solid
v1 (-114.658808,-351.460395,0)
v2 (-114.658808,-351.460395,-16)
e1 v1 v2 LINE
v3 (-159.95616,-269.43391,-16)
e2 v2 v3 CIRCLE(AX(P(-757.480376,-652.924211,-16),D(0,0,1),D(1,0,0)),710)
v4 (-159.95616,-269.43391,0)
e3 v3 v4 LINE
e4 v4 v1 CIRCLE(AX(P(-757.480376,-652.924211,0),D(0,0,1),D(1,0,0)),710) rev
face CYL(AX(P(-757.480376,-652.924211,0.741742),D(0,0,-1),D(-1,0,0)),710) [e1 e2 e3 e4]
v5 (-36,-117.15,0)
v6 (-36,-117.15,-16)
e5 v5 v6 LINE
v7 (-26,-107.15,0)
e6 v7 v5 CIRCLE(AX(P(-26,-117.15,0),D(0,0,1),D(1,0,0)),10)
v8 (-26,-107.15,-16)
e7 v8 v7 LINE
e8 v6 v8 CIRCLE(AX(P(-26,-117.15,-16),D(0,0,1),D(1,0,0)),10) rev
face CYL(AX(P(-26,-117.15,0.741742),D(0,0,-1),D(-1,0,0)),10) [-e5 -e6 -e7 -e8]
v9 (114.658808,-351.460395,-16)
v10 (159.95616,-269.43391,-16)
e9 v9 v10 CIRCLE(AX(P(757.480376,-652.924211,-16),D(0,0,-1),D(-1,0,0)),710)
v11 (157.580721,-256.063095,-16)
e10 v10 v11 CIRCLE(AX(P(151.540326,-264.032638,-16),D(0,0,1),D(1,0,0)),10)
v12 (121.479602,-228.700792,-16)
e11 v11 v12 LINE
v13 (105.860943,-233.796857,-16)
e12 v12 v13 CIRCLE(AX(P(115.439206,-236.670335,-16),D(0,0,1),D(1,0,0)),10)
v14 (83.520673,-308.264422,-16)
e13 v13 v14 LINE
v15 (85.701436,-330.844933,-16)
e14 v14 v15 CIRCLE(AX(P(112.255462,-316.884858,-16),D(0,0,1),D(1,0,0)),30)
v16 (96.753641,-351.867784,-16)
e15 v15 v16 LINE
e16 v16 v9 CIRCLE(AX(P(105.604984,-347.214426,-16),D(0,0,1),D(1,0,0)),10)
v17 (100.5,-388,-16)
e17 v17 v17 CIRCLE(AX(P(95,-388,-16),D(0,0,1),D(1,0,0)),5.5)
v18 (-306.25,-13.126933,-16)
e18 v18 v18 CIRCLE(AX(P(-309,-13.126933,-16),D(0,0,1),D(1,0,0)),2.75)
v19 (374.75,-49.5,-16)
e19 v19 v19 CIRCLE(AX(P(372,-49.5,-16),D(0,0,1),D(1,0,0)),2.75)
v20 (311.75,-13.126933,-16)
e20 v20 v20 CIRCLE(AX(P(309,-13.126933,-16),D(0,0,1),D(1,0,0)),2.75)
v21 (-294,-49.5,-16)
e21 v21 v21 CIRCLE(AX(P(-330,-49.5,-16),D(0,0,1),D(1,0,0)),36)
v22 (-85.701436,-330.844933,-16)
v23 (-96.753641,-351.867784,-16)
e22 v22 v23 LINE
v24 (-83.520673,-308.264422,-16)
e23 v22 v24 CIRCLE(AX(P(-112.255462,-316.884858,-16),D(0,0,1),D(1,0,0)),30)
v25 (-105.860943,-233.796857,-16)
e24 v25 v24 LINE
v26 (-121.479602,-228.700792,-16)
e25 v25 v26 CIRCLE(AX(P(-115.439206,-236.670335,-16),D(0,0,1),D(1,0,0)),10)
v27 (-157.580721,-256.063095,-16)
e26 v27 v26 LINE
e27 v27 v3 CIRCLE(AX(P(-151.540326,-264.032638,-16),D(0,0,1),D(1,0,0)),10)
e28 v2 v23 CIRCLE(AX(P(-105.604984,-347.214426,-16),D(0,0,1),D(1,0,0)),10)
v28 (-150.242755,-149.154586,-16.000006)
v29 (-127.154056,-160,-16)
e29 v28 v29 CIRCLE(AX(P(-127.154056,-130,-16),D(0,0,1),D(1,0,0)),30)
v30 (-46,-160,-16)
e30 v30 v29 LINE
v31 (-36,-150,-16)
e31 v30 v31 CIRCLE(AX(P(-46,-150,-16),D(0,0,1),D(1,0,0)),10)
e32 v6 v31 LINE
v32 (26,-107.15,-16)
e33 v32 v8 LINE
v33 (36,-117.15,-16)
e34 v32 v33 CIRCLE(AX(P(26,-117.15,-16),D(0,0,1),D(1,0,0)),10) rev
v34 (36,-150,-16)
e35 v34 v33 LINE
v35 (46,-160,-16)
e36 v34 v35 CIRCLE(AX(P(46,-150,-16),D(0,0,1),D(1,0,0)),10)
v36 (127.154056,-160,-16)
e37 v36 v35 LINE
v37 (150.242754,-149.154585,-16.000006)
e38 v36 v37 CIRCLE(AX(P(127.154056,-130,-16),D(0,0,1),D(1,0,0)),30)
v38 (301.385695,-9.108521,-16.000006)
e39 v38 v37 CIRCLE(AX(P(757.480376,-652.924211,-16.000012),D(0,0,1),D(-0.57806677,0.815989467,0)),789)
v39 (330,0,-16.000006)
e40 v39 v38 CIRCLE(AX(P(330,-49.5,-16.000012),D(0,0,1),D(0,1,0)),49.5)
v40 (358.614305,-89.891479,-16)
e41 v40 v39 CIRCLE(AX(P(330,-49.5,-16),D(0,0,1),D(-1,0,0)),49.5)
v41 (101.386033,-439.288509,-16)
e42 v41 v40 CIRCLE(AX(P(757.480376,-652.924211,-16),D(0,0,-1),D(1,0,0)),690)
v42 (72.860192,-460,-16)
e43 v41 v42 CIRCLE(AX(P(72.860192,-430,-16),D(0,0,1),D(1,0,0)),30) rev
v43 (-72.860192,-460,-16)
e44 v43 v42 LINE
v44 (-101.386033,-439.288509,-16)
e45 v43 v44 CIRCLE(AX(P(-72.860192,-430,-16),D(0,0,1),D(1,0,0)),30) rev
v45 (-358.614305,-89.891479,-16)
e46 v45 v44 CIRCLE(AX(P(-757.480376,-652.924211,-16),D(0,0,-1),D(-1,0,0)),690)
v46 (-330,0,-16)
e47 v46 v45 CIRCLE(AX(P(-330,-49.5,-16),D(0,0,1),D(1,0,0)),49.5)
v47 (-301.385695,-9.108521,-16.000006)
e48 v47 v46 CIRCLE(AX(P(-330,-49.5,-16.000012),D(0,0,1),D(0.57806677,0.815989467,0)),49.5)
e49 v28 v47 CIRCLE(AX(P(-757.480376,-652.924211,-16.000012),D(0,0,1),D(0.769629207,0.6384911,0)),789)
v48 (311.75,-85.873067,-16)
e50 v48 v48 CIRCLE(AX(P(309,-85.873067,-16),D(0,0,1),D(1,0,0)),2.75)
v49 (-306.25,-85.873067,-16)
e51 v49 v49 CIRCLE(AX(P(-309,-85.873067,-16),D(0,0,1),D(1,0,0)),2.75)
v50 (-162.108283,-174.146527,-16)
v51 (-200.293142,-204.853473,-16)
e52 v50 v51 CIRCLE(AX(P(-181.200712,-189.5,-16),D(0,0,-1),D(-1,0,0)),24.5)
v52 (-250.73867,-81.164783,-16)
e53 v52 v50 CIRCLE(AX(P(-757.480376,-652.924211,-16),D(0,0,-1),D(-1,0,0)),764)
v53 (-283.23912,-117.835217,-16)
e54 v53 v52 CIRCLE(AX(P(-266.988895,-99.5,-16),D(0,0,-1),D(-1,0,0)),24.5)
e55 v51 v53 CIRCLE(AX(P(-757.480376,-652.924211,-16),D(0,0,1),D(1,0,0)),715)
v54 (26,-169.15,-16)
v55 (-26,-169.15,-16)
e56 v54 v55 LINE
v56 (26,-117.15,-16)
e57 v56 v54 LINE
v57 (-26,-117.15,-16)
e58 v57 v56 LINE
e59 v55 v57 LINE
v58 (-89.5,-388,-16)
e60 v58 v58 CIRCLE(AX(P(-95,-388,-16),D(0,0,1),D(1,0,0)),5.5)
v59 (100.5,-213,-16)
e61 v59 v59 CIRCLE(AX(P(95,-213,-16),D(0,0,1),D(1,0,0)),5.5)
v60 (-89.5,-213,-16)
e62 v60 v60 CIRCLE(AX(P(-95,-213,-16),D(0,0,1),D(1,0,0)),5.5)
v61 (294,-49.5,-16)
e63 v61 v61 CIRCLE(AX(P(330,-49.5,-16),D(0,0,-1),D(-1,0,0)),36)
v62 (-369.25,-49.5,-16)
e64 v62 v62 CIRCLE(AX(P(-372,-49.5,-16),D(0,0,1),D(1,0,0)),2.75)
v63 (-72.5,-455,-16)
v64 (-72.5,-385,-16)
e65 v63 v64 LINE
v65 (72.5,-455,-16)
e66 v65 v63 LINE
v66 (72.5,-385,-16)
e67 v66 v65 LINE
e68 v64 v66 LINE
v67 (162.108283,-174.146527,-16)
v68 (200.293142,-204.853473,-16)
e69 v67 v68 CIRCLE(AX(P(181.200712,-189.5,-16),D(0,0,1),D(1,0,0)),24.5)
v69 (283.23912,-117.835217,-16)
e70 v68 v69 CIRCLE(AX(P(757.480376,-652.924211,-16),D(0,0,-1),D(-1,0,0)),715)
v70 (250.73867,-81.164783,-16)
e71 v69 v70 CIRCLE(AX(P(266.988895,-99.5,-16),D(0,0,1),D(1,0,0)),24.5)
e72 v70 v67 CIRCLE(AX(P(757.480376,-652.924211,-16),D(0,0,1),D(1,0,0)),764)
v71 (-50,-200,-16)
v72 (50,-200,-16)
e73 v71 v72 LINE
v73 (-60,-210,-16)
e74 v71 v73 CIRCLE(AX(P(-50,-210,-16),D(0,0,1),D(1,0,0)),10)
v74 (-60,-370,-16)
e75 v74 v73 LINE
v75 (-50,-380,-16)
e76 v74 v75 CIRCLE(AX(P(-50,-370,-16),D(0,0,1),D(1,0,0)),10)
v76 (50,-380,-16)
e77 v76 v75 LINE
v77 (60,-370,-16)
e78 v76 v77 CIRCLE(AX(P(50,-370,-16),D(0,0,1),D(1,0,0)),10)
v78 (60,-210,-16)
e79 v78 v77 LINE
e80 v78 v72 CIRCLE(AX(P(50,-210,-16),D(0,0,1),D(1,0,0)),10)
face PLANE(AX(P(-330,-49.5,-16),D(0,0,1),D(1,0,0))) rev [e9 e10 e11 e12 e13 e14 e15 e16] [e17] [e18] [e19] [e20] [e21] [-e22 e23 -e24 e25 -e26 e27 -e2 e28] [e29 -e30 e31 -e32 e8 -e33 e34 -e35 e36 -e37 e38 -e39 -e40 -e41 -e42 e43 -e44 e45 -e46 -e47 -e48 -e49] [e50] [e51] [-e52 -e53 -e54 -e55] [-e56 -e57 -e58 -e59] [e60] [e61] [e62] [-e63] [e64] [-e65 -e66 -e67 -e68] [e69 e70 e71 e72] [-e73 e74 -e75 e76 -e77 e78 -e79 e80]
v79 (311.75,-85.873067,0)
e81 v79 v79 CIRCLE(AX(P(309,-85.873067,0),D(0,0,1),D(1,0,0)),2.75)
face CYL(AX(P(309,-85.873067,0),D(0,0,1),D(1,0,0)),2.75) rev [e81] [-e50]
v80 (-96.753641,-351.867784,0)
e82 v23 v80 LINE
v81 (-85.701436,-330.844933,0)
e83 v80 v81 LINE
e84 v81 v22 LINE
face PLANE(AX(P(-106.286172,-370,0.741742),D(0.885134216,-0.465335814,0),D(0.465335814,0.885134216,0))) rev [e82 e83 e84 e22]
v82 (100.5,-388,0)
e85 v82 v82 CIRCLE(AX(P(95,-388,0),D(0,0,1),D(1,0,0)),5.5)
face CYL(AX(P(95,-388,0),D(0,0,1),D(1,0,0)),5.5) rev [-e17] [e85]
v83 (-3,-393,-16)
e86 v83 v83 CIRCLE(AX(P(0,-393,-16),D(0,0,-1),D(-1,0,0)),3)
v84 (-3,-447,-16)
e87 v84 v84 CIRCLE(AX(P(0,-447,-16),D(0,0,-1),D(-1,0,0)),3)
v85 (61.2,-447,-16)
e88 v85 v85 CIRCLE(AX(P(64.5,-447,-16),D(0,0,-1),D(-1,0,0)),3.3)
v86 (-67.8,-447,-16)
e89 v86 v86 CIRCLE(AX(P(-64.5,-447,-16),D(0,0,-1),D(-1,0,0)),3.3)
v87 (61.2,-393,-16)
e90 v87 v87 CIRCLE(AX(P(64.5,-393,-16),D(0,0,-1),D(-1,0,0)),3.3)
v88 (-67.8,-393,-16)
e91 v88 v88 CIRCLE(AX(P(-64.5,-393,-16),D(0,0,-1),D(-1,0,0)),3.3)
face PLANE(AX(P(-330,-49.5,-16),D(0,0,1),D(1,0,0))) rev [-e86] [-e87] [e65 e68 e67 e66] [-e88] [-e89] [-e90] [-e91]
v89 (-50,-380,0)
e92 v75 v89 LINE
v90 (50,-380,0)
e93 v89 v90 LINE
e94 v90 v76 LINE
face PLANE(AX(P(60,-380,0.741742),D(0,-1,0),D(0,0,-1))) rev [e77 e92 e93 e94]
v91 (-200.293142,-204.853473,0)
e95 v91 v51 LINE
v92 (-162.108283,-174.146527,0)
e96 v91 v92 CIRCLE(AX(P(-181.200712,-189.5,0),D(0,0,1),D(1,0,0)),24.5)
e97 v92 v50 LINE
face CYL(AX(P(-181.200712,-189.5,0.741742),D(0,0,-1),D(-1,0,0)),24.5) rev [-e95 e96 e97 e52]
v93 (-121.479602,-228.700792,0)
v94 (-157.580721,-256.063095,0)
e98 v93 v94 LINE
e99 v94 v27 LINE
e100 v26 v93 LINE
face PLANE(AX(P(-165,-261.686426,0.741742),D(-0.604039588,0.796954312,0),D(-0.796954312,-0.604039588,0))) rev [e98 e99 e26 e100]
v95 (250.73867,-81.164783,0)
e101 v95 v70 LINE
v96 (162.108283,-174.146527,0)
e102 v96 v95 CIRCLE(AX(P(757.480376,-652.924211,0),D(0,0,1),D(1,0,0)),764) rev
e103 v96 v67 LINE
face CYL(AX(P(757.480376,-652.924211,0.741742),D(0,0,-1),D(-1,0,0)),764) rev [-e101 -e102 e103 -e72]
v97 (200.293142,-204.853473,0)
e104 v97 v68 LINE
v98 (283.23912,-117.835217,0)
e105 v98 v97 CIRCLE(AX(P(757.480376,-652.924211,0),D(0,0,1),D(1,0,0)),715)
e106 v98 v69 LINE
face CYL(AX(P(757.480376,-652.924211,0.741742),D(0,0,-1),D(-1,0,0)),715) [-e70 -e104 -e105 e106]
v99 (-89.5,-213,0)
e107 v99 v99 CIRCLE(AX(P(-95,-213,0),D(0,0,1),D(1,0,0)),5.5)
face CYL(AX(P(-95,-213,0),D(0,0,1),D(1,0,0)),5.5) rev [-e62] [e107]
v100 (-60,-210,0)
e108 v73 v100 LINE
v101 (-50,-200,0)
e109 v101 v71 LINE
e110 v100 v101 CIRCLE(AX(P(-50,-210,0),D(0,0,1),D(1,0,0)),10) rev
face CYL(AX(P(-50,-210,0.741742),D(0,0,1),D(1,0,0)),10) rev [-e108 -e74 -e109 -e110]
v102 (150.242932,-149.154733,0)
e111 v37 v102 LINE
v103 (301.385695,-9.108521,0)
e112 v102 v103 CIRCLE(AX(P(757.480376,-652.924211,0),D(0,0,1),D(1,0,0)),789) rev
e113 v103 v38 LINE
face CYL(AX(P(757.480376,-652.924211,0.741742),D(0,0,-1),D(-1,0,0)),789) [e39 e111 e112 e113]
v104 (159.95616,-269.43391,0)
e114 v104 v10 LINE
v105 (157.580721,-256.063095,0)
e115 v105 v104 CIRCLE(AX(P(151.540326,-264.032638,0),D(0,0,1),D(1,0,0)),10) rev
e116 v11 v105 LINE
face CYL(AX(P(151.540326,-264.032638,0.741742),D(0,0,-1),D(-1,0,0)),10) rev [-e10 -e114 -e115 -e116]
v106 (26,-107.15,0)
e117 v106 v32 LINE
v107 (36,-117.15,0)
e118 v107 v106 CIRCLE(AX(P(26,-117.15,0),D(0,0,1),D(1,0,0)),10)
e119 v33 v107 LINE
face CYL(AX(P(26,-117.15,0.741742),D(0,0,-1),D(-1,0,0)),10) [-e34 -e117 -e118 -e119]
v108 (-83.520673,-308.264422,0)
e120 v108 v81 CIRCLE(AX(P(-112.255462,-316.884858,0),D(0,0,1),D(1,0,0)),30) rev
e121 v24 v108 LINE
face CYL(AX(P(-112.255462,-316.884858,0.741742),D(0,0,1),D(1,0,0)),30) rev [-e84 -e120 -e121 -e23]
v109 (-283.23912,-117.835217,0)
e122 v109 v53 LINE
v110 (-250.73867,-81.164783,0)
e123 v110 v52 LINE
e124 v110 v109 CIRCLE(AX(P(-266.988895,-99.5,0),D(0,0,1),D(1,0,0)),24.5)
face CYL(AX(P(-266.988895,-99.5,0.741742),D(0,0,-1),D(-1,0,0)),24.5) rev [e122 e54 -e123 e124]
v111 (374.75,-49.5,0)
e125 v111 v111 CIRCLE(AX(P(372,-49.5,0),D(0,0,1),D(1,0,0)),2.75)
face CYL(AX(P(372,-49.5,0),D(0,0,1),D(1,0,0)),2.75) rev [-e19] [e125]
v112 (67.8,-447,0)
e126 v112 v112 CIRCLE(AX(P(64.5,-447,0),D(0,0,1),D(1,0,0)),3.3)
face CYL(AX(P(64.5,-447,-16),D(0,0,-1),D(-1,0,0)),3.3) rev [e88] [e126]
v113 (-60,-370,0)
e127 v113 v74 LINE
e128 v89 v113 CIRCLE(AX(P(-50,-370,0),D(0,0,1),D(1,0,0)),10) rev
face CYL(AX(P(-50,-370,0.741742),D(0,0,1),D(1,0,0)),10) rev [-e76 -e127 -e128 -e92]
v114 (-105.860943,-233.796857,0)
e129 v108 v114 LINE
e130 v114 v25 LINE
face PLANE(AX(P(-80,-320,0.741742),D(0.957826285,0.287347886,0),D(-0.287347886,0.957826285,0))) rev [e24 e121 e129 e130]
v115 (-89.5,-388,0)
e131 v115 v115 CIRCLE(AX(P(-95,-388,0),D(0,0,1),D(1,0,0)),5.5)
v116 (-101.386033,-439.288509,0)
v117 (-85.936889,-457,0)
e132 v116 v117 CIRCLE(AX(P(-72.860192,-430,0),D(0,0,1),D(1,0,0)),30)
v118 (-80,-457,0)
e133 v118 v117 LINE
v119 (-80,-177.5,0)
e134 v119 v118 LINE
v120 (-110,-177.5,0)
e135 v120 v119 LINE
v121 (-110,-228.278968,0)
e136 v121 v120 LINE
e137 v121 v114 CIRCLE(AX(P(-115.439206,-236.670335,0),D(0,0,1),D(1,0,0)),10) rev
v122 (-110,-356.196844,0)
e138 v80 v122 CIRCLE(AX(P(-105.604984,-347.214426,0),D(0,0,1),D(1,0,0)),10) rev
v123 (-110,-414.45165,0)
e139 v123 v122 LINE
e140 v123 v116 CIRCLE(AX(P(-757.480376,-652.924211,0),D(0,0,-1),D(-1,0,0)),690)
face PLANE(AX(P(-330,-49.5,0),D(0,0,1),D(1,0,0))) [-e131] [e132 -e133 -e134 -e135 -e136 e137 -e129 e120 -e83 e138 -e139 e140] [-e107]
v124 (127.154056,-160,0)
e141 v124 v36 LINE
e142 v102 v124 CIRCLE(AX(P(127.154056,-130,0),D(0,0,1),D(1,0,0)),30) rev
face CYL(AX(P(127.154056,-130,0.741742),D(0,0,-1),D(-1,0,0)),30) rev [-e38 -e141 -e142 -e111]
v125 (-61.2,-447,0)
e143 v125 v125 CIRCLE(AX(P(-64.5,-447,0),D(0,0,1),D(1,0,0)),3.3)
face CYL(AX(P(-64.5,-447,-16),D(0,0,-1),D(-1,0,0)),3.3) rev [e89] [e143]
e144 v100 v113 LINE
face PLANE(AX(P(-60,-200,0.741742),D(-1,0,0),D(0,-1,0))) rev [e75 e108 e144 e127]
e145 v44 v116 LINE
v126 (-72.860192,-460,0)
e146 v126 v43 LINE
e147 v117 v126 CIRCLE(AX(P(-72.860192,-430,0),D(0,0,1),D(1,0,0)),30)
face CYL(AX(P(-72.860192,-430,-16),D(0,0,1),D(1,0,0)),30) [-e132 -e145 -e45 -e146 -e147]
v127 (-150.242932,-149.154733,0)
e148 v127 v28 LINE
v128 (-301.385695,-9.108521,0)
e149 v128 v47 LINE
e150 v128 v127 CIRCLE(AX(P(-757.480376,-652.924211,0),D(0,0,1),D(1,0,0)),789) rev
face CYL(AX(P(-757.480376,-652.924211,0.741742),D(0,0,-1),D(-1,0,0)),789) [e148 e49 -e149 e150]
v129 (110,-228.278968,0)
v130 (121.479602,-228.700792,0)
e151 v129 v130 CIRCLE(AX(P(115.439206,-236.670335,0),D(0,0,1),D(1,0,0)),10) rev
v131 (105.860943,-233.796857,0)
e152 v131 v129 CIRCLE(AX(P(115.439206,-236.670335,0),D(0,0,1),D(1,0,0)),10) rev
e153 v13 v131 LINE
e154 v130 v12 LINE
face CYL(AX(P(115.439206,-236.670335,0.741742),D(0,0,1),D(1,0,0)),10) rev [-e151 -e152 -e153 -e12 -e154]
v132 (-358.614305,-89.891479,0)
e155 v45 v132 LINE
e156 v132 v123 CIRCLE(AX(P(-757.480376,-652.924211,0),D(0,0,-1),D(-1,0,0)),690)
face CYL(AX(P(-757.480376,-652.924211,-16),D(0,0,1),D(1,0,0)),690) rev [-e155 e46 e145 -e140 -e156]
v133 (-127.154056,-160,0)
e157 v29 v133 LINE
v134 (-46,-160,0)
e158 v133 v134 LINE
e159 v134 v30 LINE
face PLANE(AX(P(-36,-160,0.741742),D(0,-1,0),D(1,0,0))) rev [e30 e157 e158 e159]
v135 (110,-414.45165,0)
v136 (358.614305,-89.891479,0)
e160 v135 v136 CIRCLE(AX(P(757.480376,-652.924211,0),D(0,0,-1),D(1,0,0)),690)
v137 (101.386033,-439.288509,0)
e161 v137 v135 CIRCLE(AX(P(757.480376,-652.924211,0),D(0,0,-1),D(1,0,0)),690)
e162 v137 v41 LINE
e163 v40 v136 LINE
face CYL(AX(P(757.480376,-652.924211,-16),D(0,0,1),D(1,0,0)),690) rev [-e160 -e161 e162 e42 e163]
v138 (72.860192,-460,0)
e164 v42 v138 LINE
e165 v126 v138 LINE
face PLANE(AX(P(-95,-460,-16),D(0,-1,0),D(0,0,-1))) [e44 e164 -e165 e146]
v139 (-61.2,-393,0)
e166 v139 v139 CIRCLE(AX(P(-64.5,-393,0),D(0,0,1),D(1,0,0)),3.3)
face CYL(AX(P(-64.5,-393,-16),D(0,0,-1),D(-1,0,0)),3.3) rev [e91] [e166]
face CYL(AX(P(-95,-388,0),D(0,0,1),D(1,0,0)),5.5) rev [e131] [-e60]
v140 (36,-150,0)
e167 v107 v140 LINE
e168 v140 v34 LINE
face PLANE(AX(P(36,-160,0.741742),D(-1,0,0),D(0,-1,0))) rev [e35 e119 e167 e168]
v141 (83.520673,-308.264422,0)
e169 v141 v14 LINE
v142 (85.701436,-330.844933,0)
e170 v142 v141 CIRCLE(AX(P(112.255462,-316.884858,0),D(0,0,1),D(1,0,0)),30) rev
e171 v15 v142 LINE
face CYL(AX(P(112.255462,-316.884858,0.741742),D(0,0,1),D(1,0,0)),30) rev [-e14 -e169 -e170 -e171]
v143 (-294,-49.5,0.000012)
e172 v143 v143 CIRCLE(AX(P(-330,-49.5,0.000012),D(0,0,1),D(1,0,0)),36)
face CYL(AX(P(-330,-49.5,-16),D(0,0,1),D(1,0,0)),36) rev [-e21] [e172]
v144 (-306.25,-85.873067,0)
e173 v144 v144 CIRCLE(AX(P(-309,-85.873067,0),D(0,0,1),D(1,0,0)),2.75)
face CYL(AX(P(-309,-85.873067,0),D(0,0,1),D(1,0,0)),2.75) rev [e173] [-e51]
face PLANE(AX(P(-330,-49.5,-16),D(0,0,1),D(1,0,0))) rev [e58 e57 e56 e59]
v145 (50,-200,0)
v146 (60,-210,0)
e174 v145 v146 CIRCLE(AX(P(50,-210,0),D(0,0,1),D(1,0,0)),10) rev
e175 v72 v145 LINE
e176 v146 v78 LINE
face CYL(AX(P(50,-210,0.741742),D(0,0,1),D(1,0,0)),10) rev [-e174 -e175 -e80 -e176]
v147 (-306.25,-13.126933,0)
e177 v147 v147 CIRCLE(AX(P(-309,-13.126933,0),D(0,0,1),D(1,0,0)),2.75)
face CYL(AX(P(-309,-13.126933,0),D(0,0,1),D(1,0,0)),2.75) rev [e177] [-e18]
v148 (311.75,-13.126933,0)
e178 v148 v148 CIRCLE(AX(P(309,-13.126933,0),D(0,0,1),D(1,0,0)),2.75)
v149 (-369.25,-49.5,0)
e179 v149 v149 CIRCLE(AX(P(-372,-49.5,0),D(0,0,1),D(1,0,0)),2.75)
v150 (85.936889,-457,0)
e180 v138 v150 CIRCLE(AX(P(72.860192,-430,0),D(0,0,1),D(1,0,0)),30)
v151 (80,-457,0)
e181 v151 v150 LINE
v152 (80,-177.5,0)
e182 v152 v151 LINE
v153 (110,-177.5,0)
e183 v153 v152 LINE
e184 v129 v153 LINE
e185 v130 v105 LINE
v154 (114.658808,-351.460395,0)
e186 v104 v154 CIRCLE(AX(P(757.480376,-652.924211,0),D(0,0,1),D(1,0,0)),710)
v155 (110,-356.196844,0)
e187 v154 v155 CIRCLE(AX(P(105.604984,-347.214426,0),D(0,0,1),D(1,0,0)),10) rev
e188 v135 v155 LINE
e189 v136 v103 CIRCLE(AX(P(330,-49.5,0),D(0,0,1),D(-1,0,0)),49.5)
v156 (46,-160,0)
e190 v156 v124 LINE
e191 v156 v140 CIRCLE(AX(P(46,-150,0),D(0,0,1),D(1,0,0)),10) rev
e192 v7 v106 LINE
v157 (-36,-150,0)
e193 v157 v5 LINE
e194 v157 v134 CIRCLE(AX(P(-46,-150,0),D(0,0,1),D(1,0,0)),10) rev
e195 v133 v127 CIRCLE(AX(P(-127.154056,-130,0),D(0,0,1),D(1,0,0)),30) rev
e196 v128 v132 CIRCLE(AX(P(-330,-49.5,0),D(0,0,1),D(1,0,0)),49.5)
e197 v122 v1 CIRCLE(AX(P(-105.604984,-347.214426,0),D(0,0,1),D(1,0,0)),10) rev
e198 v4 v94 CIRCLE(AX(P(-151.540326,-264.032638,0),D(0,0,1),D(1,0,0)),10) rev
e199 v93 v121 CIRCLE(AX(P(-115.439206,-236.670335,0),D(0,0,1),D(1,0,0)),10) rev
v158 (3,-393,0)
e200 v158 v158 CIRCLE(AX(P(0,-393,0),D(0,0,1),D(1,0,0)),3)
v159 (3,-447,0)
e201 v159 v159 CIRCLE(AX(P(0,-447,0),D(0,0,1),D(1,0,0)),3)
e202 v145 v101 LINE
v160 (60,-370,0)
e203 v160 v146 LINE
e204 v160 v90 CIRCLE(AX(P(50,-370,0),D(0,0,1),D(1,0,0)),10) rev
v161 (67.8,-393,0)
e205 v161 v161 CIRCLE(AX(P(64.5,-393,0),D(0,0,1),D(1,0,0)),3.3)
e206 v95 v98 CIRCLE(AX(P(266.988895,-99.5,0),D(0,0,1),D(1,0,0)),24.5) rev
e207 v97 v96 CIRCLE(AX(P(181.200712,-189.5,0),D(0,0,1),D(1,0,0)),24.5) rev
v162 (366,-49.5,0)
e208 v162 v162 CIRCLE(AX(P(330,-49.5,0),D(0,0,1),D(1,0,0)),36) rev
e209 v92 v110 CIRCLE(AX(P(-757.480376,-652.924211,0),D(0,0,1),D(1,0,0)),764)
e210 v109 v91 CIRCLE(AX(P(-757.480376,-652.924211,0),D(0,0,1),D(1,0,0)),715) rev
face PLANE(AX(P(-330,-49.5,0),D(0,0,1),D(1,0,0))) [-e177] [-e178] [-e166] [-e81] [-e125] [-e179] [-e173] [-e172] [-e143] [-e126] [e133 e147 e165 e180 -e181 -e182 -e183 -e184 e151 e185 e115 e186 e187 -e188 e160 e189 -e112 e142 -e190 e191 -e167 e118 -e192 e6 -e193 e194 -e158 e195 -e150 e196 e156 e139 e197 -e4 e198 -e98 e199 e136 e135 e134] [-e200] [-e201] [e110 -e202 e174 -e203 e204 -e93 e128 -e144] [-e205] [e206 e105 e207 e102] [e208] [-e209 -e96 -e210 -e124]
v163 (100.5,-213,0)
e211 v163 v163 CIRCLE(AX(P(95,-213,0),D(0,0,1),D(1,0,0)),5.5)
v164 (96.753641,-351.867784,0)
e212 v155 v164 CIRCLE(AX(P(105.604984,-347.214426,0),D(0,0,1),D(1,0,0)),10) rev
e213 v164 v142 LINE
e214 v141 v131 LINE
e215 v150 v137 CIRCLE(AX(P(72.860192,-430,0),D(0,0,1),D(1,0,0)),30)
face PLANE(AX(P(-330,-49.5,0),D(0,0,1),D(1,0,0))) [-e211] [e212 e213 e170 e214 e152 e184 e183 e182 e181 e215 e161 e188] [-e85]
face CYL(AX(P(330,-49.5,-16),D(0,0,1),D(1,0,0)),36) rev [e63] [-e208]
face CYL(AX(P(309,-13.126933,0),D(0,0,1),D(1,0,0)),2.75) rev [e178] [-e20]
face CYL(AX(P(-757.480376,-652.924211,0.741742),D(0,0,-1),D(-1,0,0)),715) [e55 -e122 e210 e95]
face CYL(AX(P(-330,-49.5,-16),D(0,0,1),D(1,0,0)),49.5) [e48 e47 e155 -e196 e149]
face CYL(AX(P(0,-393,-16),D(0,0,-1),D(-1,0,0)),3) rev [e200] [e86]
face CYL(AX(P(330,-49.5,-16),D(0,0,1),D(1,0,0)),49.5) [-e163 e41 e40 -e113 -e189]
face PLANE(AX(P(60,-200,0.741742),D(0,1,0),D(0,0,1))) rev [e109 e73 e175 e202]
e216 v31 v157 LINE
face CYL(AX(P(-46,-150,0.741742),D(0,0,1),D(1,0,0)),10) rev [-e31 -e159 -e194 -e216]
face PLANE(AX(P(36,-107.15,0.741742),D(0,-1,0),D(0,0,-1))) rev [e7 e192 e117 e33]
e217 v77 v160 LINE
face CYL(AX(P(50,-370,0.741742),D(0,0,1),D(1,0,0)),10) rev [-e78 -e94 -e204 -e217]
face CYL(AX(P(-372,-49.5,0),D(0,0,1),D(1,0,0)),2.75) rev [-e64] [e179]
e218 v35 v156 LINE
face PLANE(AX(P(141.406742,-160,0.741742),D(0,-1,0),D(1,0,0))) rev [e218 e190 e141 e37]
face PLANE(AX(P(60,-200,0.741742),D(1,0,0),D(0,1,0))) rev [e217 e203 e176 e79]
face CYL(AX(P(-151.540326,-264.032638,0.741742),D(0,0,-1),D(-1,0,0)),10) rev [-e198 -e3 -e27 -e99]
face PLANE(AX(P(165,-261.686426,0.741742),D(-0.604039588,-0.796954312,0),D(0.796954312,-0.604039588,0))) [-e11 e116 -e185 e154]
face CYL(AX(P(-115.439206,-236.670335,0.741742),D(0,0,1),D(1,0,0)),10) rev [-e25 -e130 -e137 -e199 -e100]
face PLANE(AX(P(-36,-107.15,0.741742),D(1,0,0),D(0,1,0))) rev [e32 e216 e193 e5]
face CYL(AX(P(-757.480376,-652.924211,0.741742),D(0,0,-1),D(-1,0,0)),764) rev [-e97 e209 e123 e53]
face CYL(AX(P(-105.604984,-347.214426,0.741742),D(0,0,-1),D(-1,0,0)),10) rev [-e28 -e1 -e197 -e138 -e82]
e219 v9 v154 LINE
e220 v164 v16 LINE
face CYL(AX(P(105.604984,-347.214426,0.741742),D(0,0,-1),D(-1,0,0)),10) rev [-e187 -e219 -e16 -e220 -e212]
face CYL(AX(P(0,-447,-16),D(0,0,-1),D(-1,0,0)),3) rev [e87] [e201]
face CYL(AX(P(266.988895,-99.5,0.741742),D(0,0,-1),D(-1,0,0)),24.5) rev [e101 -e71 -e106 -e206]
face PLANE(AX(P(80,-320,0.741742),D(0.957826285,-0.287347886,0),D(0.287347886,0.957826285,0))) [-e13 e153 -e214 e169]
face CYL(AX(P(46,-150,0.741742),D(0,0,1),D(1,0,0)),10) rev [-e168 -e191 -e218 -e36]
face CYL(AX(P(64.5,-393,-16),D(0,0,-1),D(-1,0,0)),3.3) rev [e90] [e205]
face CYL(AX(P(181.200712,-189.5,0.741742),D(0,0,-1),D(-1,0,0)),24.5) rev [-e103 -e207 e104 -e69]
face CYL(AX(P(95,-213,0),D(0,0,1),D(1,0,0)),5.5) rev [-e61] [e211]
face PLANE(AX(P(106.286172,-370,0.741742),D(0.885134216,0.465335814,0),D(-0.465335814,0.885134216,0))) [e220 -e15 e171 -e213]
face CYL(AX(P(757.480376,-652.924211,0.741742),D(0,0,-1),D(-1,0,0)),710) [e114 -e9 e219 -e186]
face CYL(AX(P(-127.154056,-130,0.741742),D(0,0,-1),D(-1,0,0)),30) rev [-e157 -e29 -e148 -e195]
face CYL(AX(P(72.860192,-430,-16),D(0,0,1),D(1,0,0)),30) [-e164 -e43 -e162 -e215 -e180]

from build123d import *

# Parameters (mm, degrees)
ESTRUSIONE_ESTRUSIONE1_DEPTH  = 16
SCHIZZO3_R                    = 36
TAGLIO_ESTRUSIONE1_DEPTH      = 597.553643858
TAGLIO_ESTRUSIONE4_DEPTH      = 597.553643858
TAGLIO_ESTRUSIONE4_DEPTH_BACK = 597.553643858
RACCORDO2_R                   = 10
TAGLIO_ESTRUSIONE16_DEPTH     = 597.553643858
RACCORDO3_R                   = 30
SCHIZZO39_W                   = 120
SCHIZZO39_H                   = 180
TAGLIO_ESTRUSIONE25_DEPTH     = 597.553643858
RACCORDO5_R                   = 10
TAGLIO_ESTRUSIONE26_DEPTH     = 597.553643858
RACCORDO6_R                   = 10
RACCORDO7_R                   = 30
M6_CLEARANCE_HOLE1_D          = 6.6
RIPETIZIONE_A_L3_COUNT        = 2
RIPETIZIONE_A_L3_PITCH        = 54
RIPETIZIONE_A_L3_COUNT_DIR2   = 2
RIPETIZIONE_A_L3_PITCH_DIR2   = 129
F_6_0_6_DIAMETER_HOLE2_D      = 6
RIPETIZIONE_A_L4_COUNT        = 2
RIPETIZIONE_A_L4_PITCH        = 54
F_11_0_11_DIAMETER_HOLE1_D    = 11
RIPETIZIONE_A_L5_COUNT        = 2
RIPETIZIONE_A_L5_PITCH        = 190
RIPETIZIONE_A_L5_COUNT_DIR2   = 2
RIPETIZIONE_A_L5_PITCH_DIR2   = 175
M5_CLEARANCE_HOLE1_D          = 5.5
RIPETIZIONECIRCOLARE1_COUNT   = 3
SPECCHIA7_COPY_1_D            = 5.5
SPECCHIA7_COPY_2_D            = 5.5


# Read off the part's stored shape, not the designer's step: Specchia8
with BuildPart() as part:
    # Schizzo2 → Estrusione-Estrusione1 (new body)
    with BuildSketch(Plane.XY):
        with BuildLine():
            Line((-330, 0), (330, 0))
            ThreePointArc((330, 0), (377.167935033, -34.485476873), (358.614305107, -89.891478597))
            ThreePointArc((358.614305107, -89.891478597), (195.466897987, -252.623261021), (95, -460))
            Line((95, -460), (-95, -460))
            ThreePointArc((-95, -460), (-195.466897987, -252.623261021), (-358.614305107, -89.891478597))
            ThreePointArc((-358.614305107, -89.891478597), (-377.167935033, -34.485476873), (-330, 0))
        make_face()
    extrude(amount=-ESTRUSIONE_ESTRUSIONE1_DEPTH)

    # Schizzo3 → Taglio-Estrusione1 (cut, symmetric)
    with BuildSketch(Plane.XY):
        with Locations((-330, -49.5)):
            Circle(SCHIZZO3_R)
    taglio_estrusione1 = extrude(amount=TAGLIO_ESTRUSIONE1_DEPTH, both=True, mode=Mode.SUBTRACT)

    # Specchia1: Taglio-Estrusione1 across plane
    add(taglio_estrusione1.mirror(Plane(origin=(0, 0, 0), x_dir=(0, 0, 1), z_dir=(1, 0, 0))), mode=Mode.SUBTRACT)

    # Schizzo12 → Taglio-Estrusione4 (cut, two sides: drawn at the far end of the back side and taken through both)
    with BuildSketch(Plane(origin=(0, 0, -16), x_dir=(-1, 0, 0), z_dir=(0, 0, -1)).offset(-TAGLIO_ESTRUSIONE4_DEPTH_BACK)):
        with BuildLine():
            Line((-330, 0), (330, 0))
            ThreePointArc((330, 0), (314.985476873, -2.332064967), (301.385694893, -9.108521403))
            ThreePointArc((301.385694893, -9.108521403), (216.113325417, -78.953204124), (141.406742184, -160))
            Line((141.406742184, -160), (36, -160))
            Line((36, -160), (36, -107.15))
            Line((36, -107.15), (-36, -107.15))
            Line((-36, -107.15), (-36, -160))
            Line((-36, -160), (-141.406742184, -160))
            ThreePointArc((-141.406742184, -160), (-216.113325417, -78.953204124), (-301.385694893, -9.108521403))
            ThreePointArc((-301.385694893, -9.108521403), (-314.985476873, -2.332064967), (-330, 0))
        make_face()
    extrude(amount=TAGLIO_ESTRUSIONE4_DEPTH + TAGLIO_ESTRUSIONE4_DEPTH_BACK, mode=Mode.SUBTRACT)

    # Raccordo2
    raccordo2_edges = [part.edges().sort_by_distance(p)[0] for p in [
        (36, -160, -8),
        (36, -107.15, -8),
        (-36, -160, -8),
        (-36, -107.15, -8),
    ]]
    fillet(raccordo2_edges, radius=RACCORDO2_R)

    # Schizzo24 → Taglio-Estrusione16 (cut, through all)
    with BuildSketch(Plane(origin=(0, 0, -16), x_dir=(-1, 0, 0), z_dir=(0, 0, -1))):
        with BuildLine():
            ThreePointArc((200.293142061, -204.853472831), (239.934023772, -159.597976721), (283.239119921, -117.835217253))
            ThreePointArc((283.239119921, -117.835217253), (285.324112305, -83.249775131), (250.738670183, -81.164782747))
            ThreePointArc((250.738670183, -81.164782747), (204.4658122, -125.789605452), (162.108282651, -174.146527169))
            ThreePointArc((162.108282651, -174.146527169), (165.847239525, -208.592429705), (200.293142061, -204.853472831))
        make_face()
    taglio_estrusione16 = extrude(amount=-TAGLIO_ESTRUSIONE16_DEPTH, mode=Mode.SUBTRACT)

    # Specchia3: Taglio-Estrusione16 across plane
    add(taglio_estrusione16.mirror(Plane(origin=(0, 0, 0), x_dir=(0, 0, 1), z_dir=(1, 0, 0))), mode=Mode.SUBTRACT)

    # Raccordo3
    raccordo3_edges = [part.edges().sort_by_distance(p)[0] for p in [
        (-141.406742184, -160, -8),
        (141.406742184, -160, -8),
        (-95, -460, -8),
        (95, -460, -8),
    ]]
    fillet(raccordo3_edges, radius=RACCORDO3_R)

    # Schizzo39 → Taglio-Estrusione25 (cut, through all)
    with BuildSketch(Plane(origin=(0, 0, -16), x_dir=(-1, 0, 0), z_dir=(0, 0, -1))):
        with Locations((0, -290)):
            Rectangle(SCHIZZO39_W, SCHIZZO39_H)
    extrude(amount=-TAGLIO_ESTRUSIONE25_DEPTH, mode=Mode.SUBTRACT)

    # Raccordo5
    raccordo5_edges = [part.edges().sort_by_distance(p)[0] for p in [
        (60, -380, -8),
        (60, -200, -8),
        (-60, -200, -8),
        (-60, -380, -8),
    ]]
    fillet(raccordo5_edges, radius=RACCORDO5_R)

    # Schizzo40 → Taglio-Estrusione26 (cut, through all)
    with BuildSketch(Plane(origin=(0, 0, -16), x_dir=(-1, 0, 0), z_dir=(0, 0, -1))):
        with BuildLine():
            Line((165, -261.686426461), (110, -220))
            Line((110, -220), (80, -320))
            Line((80, -320), (106.286172484, -370))
            ThreePointArc((106.286172484, -370), (133.289241422, -314.567258295), (165, -261.686426461))
        make_face()
    taglio_estrusione26 = extrude(amount=-TAGLIO_ESTRUSIONE26_DEPTH, mode=Mode.SUBTRACT)

    # Specchia6: Taglio-Estrusione26 across plane
    add(taglio_estrusione26.mirror(Plane(origin=(0, 0, 0), x_dir=(0, 0, 1), z_dir=(1, 0, 0))), mode=Mode.SUBTRACT)

    # Raccordo6
    raccordo6_edges = [part.edges().sort_by_distance(p)[0] for p in [
        (-165, -261.686426461, -8),
        (-106.286172484, -370, -8),
        (-110, -220, -8),
        (106.286172484, -370, -8),
        (165, -261.686426461, -8),
        (110, -220, -8),
    ]]
    fillet(raccordo6_edges, radius=RACCORDO6_R)

    # Raccordo7
    raccordo7_edges = [part.edges().sort_by_distance(p)[0] for p in [
        (-80, -320, -8),
        (80, -320, -8),
    ]]
    fillet(raccordo7_edges, radius=RACCORDO7_R)

    # M6 Clearance Hole1 (through all)
    with Locations(Plane(origin=(0, 0, -16), x_dir=(-1, 0, 0), z_dir=(0, 0, -1))):
        with Locations((64.5, -393)):
            m6_clearance_hole1 = Hole(M6_CLEARANCE_HOLE1_D / 2)

    # Ripetizione a L3: M6 Clearance Hole1 2 × 2
    with Locations(*[(j * RIPETIZIONE_A_L3_PITCH_DIR2, -i * RIPETIZIONE_A_L3_PITCH, 0) for i in range(RIPETIZIONE_A_L3_COUNT) for j in range(RIPETIZIONE_A_L3_COUNT_DIR2) if (i, j) != (0, 0)]):
        add(m6_clearance_hole1, mode=Mode.SUBTRACT)

    # Ø6.0 (6) Diameter Hole2 (through all)
    with Locations(Plane(origin=(0, 0, -16), x_dir=(-1, 0, 0), z_dir=(0, 0, -1))):
        with Locations((0, -393)):
            f_6_0_6_diameter_hole2 = Hole(F_6_0_6_DIAMETER_HOLE2_D / 2)

    # Ripetizione a L4: Ø6.0 (6) Diameter Hole2 ×2
    with Locations(*[(0, -i * RIPETIZIONE_A_L4_PITCH, 0) for i in range(1, RIPETIZIONE_A_L4_COUNT)]):
        add(f_6_0_6_diameter_hole2, mode=Mode.SUBTRACT)

    # Ø11.0 (11) Diameter Hole1 (through all)
    with Locations(Plane.XY):
        with Locations((-95, -213)):
            f_11_0_11_diameter_hole1 = Hole(F_11_0_11_DIAMETER_HOLE1_D / 2)

    # Ripetizione a L5: 11.0 _11_ Diameter Hole1 2 × 2
    with Locations(*[(i * RIPETIZIONE_A_L5_PITCH, -j * RIPETIZIONE_A_L5_PITCH_DIR2, 0) for i in range(RIPETIZIONE_A_L5_COUNT) for j in range(RIPETIZIONE_A_L5_COUNT_DIR2) if (i, j) != (0, 0)]):
        add(f_11_0_11_diameter_hole1, mode=Mode.SUBTRACT)

    # M5 Clearance Hole1 (through all)
    with Locations(Plane.XY):
        with Locations((-372, -49.5)):
            m5_clearance_hole1 = Hole(M5_CLEARANCE_HOLE1_D / 2)

    # RipetizioneCircolare1: M5 Clearance Hole1 ×3 about axis
    ripetizionecircolare1_axis = Axis((-330, -49.5, 0), (0, 0, 1))
    for i in range(1, RIPETIZIONECIRCOLARE1_COUNT):
        add(m5_clearance_hole1.rotate(ripetizionecircolare1_axis, i * 360 / RIPETIZIONECIRCOLARE1_COUNT), mode=Mode.SUBTRACT)

    # Specchia7: M5 Clearance Hole1 across plane
    add(m5_clearance_hole1.mirror(Plane(origin=(0, 0, 0), x_dir=(0, 0, 1), z_dir=(1, 0, 0))), mode=Mode.SUBTRACT)

    # Specchia7 copy 1 (through all)
    with Locations(Plane(origin=(537.868257487, 211.538383249, 0), x_dir=(0.4999999999999998, 0.8660254037844387, 0), z_dir=(0, 0, 1))):
        with Locations((-372, 49.5)):
            Hole(SPECCHIA7_COPY_1_D / 2)

    # Specchia7 copy 2 (through all)
    with Locations(Plane(origin=(452.131742513, -360.038383249, 0), x_dir=(0.5000000000000004, -0.8660254037844384, 0), z_dir=(0, 0, 1))):
        with Locations((-372, 49.5)):
            Hole(SPECCHIA7_COPY_2_D / 2)

    # Specchia8: part across plane


with BuildPart() as part_1:
    add(part.part)
    add(part.part.mirror(Plane(origin=(0, 0, 0), x_dir=(0, 0, 1), z_dir=(1, 0, 0))))


solid = part_1.part
